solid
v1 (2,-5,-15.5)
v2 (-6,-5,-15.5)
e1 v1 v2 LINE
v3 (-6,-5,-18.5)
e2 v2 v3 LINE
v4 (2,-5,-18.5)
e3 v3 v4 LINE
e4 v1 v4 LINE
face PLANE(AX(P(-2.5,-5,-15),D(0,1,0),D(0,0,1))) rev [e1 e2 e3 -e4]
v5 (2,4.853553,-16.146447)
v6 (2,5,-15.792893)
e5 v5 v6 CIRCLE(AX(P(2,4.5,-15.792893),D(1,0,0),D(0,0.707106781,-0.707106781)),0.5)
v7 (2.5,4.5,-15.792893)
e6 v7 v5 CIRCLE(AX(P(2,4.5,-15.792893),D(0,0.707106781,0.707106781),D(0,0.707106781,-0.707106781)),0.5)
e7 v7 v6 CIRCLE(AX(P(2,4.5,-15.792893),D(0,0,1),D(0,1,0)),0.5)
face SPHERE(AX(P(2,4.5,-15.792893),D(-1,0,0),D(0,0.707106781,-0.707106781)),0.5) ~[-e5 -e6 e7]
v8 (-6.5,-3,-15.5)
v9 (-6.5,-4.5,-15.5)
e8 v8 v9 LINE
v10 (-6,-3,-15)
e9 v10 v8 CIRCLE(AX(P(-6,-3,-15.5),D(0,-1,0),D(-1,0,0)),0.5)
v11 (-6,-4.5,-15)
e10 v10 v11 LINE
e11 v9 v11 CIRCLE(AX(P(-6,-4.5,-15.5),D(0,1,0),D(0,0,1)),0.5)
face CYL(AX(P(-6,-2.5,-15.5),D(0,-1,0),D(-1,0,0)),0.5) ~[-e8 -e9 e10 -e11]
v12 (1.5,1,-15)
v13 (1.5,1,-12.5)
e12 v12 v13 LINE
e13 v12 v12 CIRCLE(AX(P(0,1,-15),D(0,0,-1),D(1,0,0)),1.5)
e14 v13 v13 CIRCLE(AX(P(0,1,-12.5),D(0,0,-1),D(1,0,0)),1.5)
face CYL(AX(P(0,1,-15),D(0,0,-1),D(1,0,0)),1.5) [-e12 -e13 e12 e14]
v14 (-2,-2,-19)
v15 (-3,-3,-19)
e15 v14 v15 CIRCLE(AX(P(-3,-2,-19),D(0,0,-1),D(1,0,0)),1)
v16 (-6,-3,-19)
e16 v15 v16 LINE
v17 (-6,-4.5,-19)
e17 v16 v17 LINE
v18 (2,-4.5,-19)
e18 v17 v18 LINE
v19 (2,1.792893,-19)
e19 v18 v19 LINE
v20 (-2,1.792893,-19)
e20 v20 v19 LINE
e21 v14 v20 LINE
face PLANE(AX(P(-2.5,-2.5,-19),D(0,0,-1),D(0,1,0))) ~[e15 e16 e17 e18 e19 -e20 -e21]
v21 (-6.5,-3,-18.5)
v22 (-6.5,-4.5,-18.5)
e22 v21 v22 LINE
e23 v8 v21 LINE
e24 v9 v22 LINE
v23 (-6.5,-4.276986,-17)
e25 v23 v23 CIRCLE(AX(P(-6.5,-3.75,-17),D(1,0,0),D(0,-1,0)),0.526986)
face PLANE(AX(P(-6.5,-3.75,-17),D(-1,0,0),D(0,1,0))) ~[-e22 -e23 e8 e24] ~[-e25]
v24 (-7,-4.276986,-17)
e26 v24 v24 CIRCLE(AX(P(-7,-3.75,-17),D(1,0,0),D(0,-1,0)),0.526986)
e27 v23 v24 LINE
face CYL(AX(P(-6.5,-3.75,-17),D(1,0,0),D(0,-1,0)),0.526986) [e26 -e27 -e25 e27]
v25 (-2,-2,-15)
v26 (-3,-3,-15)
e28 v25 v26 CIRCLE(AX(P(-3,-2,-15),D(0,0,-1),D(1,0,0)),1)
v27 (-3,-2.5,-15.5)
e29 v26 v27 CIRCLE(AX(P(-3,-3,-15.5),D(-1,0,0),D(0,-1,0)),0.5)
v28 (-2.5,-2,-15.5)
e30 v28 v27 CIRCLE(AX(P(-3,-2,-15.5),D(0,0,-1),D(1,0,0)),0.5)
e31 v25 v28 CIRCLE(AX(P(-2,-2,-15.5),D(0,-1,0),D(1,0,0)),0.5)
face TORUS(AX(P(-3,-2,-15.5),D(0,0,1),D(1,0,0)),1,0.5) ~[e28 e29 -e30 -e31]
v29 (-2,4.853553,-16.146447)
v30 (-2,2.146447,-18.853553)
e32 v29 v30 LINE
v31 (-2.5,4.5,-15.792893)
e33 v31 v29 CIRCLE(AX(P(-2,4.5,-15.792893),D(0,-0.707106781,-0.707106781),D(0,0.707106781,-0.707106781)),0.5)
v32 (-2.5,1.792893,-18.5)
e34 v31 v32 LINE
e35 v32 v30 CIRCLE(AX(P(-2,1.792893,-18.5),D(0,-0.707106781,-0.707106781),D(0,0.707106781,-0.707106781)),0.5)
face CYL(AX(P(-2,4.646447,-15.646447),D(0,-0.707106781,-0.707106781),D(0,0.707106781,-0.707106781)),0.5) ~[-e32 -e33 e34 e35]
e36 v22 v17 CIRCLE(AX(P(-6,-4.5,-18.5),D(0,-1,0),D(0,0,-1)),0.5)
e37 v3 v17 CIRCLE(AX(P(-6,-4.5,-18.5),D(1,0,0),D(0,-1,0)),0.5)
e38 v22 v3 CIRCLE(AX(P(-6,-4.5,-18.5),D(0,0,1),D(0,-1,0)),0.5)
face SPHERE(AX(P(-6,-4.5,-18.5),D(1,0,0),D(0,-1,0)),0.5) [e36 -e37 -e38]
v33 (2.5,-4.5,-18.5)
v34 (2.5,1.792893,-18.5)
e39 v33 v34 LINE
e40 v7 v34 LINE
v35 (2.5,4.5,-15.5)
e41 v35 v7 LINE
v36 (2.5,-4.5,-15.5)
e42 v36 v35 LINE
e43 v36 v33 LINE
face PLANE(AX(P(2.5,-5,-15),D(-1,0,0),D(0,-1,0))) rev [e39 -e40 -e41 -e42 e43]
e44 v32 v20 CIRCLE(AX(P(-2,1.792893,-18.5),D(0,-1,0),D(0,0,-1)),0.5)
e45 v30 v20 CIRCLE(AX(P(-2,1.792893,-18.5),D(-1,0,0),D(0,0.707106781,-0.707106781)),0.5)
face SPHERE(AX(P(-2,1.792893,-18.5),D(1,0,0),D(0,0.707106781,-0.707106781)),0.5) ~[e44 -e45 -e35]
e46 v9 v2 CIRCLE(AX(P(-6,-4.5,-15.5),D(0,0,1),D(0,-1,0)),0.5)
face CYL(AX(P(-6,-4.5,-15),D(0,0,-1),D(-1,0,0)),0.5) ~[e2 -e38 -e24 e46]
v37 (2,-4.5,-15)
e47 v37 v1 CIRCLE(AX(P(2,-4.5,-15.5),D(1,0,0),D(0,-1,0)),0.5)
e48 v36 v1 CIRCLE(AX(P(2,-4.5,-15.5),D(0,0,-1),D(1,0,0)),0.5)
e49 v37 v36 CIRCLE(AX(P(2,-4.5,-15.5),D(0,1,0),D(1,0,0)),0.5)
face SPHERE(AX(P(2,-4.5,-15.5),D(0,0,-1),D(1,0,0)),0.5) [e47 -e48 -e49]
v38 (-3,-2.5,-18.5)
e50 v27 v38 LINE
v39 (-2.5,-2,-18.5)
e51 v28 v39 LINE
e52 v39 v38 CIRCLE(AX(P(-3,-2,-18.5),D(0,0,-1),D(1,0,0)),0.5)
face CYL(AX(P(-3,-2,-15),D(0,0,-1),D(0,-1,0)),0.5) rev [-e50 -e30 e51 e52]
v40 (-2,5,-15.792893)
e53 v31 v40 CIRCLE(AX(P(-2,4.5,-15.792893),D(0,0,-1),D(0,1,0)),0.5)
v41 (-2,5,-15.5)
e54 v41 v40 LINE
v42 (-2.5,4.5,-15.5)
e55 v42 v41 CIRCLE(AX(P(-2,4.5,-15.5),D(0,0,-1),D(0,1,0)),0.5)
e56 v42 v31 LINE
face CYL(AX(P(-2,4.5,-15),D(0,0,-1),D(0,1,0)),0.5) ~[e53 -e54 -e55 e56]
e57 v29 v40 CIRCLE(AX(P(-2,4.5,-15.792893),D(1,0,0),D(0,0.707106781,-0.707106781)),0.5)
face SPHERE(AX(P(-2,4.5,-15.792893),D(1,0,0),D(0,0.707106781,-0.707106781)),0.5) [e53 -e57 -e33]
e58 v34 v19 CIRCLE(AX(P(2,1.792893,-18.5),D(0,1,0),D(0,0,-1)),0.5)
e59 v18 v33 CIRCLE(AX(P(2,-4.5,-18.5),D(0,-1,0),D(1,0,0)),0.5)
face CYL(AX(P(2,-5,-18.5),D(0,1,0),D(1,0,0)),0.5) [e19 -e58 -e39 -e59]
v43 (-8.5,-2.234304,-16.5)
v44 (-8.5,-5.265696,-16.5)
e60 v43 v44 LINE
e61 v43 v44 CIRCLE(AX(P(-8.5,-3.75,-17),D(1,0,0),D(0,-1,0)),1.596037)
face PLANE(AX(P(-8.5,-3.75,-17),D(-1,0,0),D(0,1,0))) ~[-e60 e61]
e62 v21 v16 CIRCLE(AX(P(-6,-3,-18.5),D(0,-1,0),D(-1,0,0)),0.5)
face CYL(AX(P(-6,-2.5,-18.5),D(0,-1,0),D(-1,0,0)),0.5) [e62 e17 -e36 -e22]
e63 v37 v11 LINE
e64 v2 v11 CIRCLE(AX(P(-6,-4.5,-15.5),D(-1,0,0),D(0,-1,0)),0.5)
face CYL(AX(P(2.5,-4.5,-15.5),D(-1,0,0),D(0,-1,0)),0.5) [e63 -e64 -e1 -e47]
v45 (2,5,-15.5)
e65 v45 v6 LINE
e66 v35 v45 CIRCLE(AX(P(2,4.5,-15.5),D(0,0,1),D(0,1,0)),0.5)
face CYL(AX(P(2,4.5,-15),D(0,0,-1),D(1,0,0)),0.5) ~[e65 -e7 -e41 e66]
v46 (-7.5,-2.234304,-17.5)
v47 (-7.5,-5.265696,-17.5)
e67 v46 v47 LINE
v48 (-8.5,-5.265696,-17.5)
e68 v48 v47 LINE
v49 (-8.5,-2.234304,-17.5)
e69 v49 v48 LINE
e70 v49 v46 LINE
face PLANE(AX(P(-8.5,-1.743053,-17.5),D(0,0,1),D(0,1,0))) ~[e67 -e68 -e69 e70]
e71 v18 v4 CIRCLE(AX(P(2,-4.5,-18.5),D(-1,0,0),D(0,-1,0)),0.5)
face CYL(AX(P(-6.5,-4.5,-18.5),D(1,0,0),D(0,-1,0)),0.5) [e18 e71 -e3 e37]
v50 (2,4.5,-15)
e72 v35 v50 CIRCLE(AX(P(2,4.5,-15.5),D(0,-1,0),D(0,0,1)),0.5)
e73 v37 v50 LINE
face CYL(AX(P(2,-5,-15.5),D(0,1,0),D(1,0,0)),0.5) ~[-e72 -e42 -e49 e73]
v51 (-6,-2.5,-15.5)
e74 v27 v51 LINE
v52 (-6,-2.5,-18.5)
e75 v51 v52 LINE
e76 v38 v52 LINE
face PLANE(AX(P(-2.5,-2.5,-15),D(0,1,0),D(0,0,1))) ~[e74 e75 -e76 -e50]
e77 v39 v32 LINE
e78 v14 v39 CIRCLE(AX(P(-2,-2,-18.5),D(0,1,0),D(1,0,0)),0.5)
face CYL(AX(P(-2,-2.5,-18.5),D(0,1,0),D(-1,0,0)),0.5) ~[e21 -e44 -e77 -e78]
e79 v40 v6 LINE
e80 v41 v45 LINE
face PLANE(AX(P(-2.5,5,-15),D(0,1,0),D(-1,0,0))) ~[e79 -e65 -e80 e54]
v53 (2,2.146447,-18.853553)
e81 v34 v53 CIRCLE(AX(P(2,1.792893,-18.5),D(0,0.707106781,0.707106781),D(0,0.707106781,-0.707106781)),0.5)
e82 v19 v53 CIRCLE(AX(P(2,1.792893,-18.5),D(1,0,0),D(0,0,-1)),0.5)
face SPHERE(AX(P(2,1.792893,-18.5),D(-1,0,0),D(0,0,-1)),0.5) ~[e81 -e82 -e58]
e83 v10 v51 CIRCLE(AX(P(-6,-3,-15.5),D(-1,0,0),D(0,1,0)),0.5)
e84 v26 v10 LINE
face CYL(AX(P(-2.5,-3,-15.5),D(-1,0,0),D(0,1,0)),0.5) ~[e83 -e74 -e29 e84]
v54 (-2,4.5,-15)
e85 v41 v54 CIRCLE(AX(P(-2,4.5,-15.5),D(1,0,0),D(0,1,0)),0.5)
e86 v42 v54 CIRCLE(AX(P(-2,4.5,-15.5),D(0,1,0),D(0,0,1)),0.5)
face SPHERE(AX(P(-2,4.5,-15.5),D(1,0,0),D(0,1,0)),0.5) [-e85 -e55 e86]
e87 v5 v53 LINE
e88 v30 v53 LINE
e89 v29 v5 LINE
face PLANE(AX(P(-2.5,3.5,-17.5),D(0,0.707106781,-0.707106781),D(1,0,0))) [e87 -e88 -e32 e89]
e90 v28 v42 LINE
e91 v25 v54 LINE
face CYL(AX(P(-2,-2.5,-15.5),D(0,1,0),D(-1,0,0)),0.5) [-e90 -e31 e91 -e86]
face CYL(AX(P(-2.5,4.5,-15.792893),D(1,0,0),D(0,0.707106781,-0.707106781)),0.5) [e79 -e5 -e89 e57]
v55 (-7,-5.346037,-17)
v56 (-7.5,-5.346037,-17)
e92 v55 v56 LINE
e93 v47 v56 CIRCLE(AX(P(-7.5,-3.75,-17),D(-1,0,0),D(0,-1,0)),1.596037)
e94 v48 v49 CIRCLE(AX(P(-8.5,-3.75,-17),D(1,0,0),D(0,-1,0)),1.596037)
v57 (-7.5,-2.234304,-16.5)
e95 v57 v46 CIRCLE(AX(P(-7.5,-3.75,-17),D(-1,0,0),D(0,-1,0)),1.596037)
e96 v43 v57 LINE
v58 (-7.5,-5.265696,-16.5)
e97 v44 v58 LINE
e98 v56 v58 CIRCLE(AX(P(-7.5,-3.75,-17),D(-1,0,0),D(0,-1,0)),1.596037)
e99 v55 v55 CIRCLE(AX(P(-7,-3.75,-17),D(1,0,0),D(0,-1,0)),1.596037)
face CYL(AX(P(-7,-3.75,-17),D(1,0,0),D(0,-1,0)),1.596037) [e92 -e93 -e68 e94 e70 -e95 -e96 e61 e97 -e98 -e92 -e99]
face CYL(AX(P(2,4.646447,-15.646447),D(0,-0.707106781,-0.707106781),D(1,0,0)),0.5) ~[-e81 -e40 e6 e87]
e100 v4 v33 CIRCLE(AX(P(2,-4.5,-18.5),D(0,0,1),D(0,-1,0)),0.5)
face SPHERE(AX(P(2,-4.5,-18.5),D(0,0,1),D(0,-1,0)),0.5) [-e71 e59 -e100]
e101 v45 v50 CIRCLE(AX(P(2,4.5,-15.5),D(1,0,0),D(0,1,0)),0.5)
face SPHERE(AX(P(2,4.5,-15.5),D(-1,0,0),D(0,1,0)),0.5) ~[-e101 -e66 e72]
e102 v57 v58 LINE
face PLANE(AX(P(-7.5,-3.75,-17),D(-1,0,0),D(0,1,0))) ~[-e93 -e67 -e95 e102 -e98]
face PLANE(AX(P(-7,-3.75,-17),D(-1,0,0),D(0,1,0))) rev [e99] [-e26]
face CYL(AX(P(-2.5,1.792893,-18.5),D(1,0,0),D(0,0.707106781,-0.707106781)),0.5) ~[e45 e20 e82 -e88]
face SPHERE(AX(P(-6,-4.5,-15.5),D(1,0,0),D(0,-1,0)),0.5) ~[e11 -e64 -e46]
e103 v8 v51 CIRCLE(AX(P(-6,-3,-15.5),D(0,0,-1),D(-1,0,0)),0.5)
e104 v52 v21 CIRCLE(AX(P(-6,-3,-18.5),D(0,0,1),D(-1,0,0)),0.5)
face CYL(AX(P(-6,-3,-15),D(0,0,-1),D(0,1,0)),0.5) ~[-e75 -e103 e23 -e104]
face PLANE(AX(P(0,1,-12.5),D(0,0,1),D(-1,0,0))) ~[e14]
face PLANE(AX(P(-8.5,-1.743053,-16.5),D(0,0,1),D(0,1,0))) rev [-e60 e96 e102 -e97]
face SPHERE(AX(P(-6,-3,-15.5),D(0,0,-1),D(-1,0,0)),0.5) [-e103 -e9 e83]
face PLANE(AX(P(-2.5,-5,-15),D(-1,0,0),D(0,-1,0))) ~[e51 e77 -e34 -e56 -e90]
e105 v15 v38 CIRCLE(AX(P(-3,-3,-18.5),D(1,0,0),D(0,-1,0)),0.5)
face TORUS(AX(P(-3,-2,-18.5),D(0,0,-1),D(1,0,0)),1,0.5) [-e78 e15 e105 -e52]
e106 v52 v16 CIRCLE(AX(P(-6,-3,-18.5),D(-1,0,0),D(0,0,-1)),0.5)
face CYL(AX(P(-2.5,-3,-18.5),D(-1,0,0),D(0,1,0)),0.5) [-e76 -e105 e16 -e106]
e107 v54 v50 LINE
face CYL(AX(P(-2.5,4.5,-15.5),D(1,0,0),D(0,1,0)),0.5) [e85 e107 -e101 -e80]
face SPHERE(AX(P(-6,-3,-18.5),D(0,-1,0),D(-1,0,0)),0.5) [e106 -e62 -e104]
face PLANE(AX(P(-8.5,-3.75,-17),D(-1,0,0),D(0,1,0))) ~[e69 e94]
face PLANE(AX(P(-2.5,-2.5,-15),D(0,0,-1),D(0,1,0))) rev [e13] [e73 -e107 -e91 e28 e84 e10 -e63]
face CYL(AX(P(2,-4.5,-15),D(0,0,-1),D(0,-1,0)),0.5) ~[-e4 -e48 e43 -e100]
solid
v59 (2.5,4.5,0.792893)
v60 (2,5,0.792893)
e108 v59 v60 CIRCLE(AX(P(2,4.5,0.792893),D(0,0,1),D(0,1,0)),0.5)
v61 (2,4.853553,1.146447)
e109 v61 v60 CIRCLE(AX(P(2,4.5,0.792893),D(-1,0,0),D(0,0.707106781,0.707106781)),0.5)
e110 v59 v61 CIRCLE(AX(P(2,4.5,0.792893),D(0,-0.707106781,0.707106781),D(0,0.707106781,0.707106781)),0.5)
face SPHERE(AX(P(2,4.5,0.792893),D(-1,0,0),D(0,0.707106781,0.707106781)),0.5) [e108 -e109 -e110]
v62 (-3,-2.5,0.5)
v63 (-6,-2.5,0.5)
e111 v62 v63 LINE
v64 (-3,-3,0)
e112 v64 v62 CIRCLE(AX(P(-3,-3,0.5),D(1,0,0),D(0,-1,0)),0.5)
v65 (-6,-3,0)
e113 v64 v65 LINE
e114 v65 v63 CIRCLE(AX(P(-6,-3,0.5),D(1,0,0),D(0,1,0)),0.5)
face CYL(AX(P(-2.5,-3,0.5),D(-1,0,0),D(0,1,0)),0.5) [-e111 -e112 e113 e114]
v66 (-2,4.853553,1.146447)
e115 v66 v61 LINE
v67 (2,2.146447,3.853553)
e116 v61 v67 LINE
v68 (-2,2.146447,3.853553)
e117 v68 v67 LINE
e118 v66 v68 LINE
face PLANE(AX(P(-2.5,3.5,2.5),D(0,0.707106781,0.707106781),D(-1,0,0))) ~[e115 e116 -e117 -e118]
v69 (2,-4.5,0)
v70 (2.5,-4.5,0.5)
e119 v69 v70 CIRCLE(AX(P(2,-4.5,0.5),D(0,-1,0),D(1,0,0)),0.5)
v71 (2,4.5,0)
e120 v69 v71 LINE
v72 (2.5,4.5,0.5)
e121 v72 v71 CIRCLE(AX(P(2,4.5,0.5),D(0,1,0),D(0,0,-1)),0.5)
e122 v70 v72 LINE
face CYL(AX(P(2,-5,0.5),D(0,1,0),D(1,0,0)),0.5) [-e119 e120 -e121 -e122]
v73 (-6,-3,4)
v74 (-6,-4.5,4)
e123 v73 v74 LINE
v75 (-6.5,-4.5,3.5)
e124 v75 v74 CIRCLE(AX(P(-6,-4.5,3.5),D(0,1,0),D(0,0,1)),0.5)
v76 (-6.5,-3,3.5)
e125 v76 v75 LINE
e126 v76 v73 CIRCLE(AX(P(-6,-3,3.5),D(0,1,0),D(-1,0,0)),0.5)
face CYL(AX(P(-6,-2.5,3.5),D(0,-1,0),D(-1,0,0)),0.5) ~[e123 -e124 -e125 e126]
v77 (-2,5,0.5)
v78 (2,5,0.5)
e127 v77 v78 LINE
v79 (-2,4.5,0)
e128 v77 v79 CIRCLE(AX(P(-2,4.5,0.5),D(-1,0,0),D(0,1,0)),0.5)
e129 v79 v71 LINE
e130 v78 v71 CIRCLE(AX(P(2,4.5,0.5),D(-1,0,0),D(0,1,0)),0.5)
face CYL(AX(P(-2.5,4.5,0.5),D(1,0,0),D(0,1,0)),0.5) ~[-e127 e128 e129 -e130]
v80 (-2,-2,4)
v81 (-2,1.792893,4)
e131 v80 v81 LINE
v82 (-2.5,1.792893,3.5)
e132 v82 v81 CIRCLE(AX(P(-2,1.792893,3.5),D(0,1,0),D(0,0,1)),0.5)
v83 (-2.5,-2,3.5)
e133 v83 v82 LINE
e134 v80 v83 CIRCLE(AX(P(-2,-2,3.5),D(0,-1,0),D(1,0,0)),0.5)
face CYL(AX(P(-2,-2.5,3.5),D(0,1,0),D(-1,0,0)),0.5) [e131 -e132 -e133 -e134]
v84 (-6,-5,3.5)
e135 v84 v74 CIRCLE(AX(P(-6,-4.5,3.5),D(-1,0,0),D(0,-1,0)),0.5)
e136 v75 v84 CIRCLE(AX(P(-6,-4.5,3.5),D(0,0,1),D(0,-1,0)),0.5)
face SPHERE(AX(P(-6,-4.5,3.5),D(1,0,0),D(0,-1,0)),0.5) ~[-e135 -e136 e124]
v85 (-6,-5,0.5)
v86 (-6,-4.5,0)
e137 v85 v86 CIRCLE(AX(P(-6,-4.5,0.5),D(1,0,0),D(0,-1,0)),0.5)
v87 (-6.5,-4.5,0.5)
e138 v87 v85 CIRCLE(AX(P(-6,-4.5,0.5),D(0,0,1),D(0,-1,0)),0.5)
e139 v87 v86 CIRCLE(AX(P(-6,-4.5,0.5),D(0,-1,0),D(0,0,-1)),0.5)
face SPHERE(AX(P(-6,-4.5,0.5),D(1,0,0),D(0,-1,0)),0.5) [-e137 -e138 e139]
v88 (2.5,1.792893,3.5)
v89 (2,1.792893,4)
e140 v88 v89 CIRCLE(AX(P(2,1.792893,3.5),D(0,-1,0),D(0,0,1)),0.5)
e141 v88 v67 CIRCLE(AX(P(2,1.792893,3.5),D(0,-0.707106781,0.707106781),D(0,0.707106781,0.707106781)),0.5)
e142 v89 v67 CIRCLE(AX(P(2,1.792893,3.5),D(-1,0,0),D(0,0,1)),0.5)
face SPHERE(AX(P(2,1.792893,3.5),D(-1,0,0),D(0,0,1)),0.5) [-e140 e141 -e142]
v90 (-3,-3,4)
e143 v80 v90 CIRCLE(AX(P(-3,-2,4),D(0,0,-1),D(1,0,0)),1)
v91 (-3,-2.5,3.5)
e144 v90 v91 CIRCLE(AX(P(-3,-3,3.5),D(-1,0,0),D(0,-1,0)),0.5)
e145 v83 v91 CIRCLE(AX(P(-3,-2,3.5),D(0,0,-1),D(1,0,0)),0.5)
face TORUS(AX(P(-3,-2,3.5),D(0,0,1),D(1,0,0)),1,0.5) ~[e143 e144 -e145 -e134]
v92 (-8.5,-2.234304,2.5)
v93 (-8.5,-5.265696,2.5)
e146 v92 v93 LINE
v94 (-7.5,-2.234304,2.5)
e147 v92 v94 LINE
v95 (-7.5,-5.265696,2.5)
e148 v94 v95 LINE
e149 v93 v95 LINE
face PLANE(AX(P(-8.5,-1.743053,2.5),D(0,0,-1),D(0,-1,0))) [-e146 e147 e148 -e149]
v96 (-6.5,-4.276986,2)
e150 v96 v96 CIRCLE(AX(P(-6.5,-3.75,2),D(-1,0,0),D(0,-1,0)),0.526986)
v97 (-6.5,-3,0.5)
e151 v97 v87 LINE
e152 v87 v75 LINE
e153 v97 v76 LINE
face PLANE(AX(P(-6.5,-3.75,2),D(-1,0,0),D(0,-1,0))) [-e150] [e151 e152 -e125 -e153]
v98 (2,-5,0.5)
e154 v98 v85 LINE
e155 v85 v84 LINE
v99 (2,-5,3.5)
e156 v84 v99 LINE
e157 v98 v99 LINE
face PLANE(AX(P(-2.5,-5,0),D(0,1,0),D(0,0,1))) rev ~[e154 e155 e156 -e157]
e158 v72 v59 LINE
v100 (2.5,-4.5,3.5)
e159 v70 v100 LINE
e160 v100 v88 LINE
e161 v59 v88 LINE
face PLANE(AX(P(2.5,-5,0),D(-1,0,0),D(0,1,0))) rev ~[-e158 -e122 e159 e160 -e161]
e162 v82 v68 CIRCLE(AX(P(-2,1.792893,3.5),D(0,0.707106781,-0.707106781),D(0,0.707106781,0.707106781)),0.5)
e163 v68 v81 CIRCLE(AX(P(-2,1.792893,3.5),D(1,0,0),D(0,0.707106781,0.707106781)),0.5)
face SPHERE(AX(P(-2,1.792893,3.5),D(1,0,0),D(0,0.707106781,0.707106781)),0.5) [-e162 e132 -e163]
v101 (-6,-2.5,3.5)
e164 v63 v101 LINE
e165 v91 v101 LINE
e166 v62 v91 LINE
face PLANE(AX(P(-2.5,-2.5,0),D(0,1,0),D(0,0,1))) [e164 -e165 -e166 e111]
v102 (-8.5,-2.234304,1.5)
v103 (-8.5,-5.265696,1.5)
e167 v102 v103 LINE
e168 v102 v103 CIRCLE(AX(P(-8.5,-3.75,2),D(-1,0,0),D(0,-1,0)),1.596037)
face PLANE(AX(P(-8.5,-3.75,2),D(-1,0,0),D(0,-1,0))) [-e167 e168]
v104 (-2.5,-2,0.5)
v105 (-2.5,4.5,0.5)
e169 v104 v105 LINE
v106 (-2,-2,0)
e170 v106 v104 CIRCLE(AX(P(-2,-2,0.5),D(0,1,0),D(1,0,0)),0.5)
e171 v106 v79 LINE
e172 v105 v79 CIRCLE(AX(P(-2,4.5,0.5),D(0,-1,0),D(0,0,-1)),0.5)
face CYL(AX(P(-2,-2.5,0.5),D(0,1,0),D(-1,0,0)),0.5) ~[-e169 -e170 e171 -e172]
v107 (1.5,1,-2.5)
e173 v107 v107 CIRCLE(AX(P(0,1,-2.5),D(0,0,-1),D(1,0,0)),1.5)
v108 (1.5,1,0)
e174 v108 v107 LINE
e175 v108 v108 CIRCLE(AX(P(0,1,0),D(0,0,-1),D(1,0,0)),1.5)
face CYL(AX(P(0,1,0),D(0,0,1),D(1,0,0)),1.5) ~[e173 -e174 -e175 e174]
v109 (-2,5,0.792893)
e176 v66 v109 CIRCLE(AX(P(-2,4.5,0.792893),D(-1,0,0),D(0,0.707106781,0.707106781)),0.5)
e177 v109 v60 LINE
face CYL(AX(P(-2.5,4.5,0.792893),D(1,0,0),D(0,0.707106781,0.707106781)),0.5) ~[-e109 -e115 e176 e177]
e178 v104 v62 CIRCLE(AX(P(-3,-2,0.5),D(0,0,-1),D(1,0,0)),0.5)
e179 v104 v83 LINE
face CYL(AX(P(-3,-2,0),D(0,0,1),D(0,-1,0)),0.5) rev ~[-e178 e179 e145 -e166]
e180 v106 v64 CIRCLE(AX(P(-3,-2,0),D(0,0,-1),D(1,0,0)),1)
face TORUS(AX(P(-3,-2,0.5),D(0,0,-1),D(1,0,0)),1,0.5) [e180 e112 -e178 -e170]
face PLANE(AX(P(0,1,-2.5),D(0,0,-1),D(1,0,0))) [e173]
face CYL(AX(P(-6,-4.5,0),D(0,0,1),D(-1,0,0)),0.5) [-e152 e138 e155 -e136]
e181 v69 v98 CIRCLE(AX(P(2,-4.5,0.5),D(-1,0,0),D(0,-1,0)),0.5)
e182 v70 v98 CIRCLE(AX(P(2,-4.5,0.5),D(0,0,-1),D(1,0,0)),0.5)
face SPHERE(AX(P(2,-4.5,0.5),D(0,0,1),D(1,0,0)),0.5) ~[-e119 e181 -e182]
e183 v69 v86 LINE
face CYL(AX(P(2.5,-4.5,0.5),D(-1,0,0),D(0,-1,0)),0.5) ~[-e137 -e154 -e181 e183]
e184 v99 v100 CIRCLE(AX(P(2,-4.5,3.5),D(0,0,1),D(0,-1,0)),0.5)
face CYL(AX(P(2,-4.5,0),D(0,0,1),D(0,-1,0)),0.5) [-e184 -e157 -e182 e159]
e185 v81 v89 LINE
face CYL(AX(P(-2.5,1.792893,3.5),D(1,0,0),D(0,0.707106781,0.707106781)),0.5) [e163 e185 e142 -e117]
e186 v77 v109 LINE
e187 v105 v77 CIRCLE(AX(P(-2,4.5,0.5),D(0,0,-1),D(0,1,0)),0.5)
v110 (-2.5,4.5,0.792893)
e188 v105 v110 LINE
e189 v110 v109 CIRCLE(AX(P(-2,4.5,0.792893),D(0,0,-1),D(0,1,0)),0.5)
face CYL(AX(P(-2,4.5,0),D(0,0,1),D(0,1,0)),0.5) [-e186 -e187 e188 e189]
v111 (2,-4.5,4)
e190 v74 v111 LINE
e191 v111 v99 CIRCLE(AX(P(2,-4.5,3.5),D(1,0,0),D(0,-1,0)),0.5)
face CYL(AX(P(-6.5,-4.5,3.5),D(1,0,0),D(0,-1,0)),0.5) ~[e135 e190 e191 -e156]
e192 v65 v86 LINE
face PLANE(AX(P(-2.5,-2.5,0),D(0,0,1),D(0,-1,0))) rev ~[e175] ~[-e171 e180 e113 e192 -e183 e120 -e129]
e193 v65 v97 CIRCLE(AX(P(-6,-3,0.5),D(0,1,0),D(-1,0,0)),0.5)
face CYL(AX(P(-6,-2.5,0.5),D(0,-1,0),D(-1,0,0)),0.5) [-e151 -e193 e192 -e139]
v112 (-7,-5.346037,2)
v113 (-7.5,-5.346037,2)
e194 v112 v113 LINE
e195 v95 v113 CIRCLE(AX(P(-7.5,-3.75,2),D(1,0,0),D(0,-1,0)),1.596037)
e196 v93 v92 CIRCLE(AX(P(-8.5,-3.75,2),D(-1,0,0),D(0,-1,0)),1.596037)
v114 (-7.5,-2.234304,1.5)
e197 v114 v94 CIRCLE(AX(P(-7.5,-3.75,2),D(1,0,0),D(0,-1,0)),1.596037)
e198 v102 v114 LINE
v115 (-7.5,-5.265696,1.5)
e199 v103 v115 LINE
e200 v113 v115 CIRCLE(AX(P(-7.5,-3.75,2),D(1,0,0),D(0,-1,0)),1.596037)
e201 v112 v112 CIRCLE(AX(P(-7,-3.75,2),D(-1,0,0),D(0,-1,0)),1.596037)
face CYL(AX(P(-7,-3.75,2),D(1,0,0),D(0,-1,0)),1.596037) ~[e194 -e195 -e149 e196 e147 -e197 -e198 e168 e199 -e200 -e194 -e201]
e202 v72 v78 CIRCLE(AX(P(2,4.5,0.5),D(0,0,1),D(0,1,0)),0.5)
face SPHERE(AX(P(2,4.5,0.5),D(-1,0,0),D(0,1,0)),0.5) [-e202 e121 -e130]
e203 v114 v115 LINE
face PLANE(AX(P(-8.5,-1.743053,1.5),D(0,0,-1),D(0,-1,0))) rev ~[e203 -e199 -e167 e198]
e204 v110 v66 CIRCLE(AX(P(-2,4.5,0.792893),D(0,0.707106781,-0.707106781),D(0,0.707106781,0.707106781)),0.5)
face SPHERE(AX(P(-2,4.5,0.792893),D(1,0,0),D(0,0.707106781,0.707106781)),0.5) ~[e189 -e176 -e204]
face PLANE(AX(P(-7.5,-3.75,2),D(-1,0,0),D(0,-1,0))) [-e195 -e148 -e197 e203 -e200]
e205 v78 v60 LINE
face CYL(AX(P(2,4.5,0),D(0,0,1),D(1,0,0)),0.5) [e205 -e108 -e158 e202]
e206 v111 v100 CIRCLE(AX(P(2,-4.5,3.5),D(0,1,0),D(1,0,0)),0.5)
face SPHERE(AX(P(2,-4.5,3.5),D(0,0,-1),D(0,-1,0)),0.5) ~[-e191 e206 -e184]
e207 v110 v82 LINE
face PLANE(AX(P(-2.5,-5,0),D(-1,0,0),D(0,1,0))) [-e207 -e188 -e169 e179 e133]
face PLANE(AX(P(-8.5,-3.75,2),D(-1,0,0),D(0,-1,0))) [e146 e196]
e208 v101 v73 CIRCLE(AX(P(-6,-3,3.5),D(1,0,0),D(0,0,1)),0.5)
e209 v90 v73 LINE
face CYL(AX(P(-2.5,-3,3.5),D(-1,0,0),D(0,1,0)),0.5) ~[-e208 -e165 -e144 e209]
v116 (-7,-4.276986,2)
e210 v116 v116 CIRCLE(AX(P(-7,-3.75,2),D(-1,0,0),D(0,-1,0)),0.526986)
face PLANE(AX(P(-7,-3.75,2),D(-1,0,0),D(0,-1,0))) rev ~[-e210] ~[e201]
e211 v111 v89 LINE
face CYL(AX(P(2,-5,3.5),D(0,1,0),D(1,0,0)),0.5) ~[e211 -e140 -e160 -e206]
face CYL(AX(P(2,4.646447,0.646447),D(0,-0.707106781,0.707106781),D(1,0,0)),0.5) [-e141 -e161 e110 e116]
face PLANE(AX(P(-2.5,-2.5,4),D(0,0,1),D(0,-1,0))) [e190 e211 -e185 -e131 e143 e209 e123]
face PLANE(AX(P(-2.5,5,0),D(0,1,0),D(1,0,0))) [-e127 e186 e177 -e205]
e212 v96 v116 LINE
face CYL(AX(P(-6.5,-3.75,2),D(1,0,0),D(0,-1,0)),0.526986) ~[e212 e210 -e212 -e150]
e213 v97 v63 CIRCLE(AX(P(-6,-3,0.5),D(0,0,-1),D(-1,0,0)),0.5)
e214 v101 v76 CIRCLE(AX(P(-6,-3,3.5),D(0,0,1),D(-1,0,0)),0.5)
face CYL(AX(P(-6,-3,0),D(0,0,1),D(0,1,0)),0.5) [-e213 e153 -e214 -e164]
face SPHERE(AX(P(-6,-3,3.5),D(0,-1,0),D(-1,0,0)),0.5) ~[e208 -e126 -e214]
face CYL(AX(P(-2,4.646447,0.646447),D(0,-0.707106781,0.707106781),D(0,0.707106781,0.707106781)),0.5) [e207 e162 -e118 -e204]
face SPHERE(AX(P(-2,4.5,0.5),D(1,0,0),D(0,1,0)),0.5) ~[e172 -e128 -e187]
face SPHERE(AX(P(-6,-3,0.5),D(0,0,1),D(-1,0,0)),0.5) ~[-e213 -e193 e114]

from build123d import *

# Parameters (mm, degrees)
F0_W      = 5
F0_H      = 10
F1_DEPTH  = 4
F2_SIZE   = 3
F3_R      = 1.5
F4_DEPTH  = 2.5
F5_W      = 2.5
F5_H      = 4
F6_DEPTH  = 4
F7_R      = 0.5
F8_R      = 0.5269864315
F9_DEPTH  = 0.5
F10_R     = 1.5960368508
F11_DEPTH = 1.5
F12_W     = 4.0138932984
F12_H     = 1
F13_DEPTH = 1


with BuildPart() as f1:
    # F0 (on Top) → F1 (new body)
    with BuildSketch(Plane.XY):
        Rectangle(F0_W, F0_H)
    extrude(amount=F1_DEPTH)

    # F2
    f2_edges = [f1.edges().sort_by_distance(p)[0] for p in [
        (0, 5, 4),
    ]]
    chamfer(f2_edges, length=F2_SIZE)

    # F3 (on face) → F4 (join)
    with BuildSketch(Plane(origin=(0, 0, 0), x_dir=(1, 0, 0), z_dir=(0, 0, -1))):
        with Locations((0, -1)):
            Circle(F3_R)
    extrude(amount=F4_DEPTH)

    # F5 (on face) → F6 (join)
    with BuildSketch(Plane(origin=(-2.5, 0, 0), x_dir=(0, -1, 0), z_dir=(-1, 0, 0))):
        with Locations((3.75, 2)):
            Rectangle(F5_W, F5_H)
    extrude(amount=F6_DEPTH)

    # F7
    f7_edges = [f1.edges().sort_by_distance(p)[0] for p in [
        (-2.5, -2.5, 2),
        (2.5, -5, 2),
        (0, 5, 0),
        (0, 5, 1),
        (2.5, 3.5, 2.5),
        (0, 2, 4),
        (2.5, 5, 0.5),
        (-2.5, 3.5, 2.5),
        (-2.5, 5, 0.5),
        (-2.5, 1.25, 0),
        (2.5, 0, 0),
        (-2, -5, 0),
        (-2, -5, 4),
        (2.5, -1.5, 4),
        (-2.5, -0.25, 4),
        (-6.5, -5, 2),
        (-6.5, -3.75, 4),
        (-6.5, -2.5, 2),
        (-6.5, -3.75, 0),
        (-4.5, -2.5, 4),
        (-4.5, -2.5, 0),
    ]]
    fillet(f7_edges, radius=F7_R)

    # F8 (on face) → F9 (join)
    with BuildSketch(Plane(origin=(-6.5, 0, 0), x_dir=(0, -1, 0), z_dir=(-1, 0, 0))):
        with Locations((3.75, 2)):
            Circle(F8_R)
    extrude(amount=F9_DEPTH)

    # F10 (on face) → F11 (join)
    with BuildSketch(Plane(origin=(-7, 0, 0), x_dir=(0, -1, 0), z_dir=(-1, 0, 0))):
        with Locations((3.75, 2)):
            Circle(F10_R)
    extrude(amount=F11_DEPTH)

    # F12 (on face) → F13 (cut)
    with BuildSketch(Plane(origin=(-8.5, 0, 0), x_dir=(0, -1, 0), z_dir=(-1, 0, 0))):
        with Locations((3.75, 2)):
            Rectangle(F12_W, F12_H)
    extrude(amount=-F13_DEPTH, mode=Mode.SUBTRACT)


with BuildPart() as f15_1:
    # F15: instance of F1
    add(f1.part.mirror(Plane(origin=(0, 1, -7.5), x_dir=(1, 0, 0), z_dir=(0, 0, -1))))


solid = Compound([f1.part, f15_1.part])
